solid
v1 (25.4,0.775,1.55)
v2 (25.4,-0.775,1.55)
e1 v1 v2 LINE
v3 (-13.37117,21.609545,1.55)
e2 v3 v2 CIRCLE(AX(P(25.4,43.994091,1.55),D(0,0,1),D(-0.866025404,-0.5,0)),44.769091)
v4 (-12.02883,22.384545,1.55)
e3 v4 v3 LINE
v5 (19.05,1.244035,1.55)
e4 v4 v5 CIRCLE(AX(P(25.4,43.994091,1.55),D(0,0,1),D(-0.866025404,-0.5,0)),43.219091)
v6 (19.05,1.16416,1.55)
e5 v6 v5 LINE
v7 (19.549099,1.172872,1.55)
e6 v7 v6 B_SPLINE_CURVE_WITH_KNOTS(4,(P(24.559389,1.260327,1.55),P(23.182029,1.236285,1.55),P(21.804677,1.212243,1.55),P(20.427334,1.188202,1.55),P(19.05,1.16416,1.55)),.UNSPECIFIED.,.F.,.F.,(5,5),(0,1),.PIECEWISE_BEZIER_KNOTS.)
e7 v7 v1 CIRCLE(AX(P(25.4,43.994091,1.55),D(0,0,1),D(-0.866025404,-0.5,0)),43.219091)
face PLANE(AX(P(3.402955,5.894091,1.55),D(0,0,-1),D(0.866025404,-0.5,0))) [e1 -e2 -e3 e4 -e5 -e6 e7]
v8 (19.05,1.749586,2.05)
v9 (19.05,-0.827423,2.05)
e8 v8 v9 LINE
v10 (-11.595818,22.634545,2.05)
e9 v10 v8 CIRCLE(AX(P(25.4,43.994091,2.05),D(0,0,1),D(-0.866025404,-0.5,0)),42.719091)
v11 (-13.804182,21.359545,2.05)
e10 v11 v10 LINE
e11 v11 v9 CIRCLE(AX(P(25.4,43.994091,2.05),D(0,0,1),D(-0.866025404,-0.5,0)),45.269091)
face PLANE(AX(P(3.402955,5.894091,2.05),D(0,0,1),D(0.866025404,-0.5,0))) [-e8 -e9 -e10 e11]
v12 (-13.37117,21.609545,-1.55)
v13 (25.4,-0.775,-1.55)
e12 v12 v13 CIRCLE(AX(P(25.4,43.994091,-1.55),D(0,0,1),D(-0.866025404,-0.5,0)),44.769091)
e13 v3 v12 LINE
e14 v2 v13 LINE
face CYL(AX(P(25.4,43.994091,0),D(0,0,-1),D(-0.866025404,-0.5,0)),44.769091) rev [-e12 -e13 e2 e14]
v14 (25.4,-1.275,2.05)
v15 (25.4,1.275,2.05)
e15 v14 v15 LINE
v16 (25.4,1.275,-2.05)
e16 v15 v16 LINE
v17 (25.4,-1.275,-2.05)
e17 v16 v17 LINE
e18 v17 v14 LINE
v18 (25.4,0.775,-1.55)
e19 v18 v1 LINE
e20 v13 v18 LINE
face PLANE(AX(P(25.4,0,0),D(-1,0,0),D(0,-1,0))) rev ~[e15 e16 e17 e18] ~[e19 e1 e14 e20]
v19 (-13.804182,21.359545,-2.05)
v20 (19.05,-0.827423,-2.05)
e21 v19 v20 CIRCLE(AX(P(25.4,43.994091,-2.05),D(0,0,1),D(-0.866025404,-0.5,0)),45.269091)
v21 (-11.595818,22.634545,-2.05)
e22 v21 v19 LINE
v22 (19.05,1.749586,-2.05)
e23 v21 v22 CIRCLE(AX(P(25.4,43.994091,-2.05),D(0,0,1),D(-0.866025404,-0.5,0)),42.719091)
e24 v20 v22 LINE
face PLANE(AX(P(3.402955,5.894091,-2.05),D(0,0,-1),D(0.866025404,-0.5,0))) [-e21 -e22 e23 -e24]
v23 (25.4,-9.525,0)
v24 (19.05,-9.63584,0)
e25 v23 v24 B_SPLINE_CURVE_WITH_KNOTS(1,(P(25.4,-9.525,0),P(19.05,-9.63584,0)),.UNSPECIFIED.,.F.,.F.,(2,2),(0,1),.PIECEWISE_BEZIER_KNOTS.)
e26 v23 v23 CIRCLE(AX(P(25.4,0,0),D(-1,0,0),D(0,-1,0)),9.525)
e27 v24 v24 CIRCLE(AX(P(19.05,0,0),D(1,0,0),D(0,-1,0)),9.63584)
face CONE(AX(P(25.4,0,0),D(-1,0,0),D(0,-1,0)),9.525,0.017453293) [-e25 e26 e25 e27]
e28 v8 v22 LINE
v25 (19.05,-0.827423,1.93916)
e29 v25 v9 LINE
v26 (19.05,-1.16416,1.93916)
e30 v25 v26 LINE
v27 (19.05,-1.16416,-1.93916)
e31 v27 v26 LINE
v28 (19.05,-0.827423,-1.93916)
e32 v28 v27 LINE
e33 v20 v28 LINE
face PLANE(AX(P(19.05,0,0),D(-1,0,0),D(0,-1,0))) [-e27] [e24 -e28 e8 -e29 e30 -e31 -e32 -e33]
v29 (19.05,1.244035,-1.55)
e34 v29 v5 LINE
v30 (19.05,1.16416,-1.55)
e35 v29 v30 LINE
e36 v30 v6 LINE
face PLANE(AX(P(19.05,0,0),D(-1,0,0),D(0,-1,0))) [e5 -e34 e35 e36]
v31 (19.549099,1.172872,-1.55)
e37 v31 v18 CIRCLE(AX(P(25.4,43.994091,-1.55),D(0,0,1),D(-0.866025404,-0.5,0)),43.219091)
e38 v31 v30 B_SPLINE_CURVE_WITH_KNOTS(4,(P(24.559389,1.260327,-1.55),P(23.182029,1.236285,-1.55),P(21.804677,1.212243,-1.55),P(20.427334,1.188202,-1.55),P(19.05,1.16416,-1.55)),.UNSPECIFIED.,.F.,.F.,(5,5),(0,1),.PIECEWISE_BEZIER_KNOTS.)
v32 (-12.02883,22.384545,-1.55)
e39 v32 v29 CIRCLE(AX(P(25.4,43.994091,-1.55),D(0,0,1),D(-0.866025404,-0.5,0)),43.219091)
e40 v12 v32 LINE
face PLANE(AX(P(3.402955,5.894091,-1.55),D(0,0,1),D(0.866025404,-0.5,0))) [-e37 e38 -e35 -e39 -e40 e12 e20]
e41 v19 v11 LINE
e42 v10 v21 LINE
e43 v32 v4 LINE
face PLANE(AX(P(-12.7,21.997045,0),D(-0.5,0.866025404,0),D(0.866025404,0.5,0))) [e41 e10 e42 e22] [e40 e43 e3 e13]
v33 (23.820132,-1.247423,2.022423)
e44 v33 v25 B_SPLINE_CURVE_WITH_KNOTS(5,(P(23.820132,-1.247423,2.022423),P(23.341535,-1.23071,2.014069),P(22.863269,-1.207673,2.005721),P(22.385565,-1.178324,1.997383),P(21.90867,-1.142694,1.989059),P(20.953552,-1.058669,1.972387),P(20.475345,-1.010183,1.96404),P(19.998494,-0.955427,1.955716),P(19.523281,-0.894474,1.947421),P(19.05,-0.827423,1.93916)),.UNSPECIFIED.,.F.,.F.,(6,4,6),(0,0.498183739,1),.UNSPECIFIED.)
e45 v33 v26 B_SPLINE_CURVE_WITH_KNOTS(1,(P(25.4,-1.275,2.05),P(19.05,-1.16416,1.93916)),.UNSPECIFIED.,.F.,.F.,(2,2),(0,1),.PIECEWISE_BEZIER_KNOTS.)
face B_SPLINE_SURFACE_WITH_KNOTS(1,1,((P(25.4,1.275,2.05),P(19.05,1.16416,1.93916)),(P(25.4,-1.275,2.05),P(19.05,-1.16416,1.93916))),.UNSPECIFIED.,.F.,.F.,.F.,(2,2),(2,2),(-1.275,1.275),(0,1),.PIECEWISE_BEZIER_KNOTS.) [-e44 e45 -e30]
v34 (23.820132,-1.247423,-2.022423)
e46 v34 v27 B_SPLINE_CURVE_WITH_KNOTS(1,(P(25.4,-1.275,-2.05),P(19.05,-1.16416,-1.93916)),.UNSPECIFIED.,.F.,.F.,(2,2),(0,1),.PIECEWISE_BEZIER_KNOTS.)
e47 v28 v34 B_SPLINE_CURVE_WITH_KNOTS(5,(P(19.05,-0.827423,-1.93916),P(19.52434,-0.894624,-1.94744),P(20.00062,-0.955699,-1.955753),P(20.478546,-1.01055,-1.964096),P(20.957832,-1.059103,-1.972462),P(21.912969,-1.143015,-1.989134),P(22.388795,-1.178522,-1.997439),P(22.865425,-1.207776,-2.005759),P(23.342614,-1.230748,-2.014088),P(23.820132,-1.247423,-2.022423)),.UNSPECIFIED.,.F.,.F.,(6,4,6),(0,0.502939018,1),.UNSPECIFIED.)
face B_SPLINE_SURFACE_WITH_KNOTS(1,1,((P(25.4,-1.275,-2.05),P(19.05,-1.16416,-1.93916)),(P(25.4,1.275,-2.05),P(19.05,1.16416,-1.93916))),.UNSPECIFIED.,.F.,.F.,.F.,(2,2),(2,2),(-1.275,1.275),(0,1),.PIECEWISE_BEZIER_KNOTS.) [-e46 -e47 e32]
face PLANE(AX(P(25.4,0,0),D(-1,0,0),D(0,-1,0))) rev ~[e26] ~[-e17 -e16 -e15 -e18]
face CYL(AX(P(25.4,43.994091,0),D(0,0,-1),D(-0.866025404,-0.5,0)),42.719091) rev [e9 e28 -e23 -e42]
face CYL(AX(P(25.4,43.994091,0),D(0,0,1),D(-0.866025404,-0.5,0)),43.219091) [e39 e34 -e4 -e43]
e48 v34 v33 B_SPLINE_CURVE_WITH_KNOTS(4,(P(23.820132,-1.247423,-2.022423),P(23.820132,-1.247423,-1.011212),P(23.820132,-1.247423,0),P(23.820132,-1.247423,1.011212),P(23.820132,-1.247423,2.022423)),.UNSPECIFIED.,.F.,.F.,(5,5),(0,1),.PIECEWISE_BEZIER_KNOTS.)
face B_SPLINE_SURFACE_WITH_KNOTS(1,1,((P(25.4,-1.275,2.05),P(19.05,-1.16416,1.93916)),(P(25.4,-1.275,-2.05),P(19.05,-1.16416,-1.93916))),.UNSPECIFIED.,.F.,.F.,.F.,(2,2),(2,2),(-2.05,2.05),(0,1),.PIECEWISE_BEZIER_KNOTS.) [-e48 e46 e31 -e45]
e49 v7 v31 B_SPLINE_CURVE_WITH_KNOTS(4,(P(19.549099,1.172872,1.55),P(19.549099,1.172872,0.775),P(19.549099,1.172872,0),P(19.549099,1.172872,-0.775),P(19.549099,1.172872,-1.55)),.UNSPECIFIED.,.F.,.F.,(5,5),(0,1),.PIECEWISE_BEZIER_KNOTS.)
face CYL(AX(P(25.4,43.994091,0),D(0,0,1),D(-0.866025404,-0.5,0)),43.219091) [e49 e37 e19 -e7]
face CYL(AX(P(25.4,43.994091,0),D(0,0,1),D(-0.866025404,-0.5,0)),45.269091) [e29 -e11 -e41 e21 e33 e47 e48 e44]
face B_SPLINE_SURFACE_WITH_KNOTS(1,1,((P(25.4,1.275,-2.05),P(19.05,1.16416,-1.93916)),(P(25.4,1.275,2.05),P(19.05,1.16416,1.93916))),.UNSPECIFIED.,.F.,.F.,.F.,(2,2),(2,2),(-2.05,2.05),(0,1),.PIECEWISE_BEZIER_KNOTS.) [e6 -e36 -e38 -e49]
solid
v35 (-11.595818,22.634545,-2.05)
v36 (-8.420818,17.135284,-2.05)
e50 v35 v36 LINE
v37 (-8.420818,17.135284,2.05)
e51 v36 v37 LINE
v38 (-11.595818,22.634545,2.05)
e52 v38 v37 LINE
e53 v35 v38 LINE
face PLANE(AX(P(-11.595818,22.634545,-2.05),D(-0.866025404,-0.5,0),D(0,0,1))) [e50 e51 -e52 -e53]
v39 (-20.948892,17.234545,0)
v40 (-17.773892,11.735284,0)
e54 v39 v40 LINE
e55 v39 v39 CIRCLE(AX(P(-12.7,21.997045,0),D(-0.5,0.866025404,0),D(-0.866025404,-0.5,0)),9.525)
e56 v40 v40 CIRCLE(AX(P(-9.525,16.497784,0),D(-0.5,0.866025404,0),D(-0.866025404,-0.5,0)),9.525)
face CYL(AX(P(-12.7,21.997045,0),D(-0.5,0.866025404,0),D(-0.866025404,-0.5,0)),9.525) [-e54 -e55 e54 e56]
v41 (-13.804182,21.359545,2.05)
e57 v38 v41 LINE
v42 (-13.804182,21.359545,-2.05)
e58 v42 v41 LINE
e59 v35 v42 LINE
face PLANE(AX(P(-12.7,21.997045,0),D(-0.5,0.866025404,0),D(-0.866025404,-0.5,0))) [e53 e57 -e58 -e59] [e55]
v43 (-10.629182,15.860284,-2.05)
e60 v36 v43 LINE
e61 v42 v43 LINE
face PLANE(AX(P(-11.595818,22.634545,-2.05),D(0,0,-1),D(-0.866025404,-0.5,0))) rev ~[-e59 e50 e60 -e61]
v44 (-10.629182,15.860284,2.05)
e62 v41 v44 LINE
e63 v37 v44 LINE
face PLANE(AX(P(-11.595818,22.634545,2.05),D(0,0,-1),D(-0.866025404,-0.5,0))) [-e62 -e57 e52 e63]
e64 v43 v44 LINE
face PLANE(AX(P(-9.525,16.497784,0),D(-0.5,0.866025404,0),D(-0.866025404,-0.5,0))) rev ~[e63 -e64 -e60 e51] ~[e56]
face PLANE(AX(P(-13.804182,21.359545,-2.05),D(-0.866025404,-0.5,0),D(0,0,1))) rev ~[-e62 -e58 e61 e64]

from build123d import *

# Parameters (mm, degrees)
F4_W     = 2.55
F4_H     = 4.1
F4_W_2   = 1.55
F4_H_2   = 3.1
F3_W     = 2.55
F3_H     = 4.1
F3_W_2   = 1.55
F3_H_2   = 3.1
F3_R     = 9.525
F7_DEPTH = 6.35
F4_R     = 9.525
F8_DEPTH = 6.35
F8_TAPER = -1


# Not quite as in the source:
# - a feature of the source that left no trace in its solid (it failed there, or was rolled back) is left out


with BuildPart() as f5:
    # F5: sweep along a path in F0
    with BuildLine(Plane.XY) as f5_path:
        ThreePointArc((-12.7, 21.9970452561), (3.4029547439, 5.8940905122), (25.4, 0))
    # F4 (on line) + F3 (on line) → F5 (sweep)
    with BuildSketch(Plane(origin=(25.4, 0, 0), x_dir=(0, -1, 0), z_dir=(-1, 0, 0))):
        Rectangle(F4_W, F4_H)
        Rectangle(F4_W_2, F4_H_2, mode=Mode.SUBTRACT)
    with BuildSketch(Plane(origin=(-12.7, 21.9970452561, 0), x_dir=(-0.8660254038, -0.5, 0), z_dir=(-0.5, 0.8660254038, 0))):
        Rectangle(F3_W, F3_H)
        Rectangle(F3_W_2, F3_H_2, mode=Mode.SUBTRACT)
    sweep(path=f5_path.line)

    # F4 (on line) → F8 (join)
    with BuildSketch(Plane(origin=(25.4, 0, 0), x_dir=(0, -1, 0), z_dir=(-1, 0, 0))):
        Circle(F4_R)
        Rectangle(F4_W, F4_H, mode=Mode.SUBTRACT)
    extrude(amount=F8_DEPTH, taper=F8_TAPER)


with BuildPart() as f7:
    # F3 (on line) → F7 (new body)
    with BuildSketch(Plane(origin=(-12.7, 21.9970452561, 0), x_dir=(-0.8660254038, -0.5, 0), z_dir=(-0.5, 0.8660254038, 0))):
        Circle(F3_R)
        Rectangle(F3_W, F3_H, mode=Mode.SUBTRACT)
    extrude(amount=-F7_DEPTH)


solid = Compound([f5.part, f7.part])
